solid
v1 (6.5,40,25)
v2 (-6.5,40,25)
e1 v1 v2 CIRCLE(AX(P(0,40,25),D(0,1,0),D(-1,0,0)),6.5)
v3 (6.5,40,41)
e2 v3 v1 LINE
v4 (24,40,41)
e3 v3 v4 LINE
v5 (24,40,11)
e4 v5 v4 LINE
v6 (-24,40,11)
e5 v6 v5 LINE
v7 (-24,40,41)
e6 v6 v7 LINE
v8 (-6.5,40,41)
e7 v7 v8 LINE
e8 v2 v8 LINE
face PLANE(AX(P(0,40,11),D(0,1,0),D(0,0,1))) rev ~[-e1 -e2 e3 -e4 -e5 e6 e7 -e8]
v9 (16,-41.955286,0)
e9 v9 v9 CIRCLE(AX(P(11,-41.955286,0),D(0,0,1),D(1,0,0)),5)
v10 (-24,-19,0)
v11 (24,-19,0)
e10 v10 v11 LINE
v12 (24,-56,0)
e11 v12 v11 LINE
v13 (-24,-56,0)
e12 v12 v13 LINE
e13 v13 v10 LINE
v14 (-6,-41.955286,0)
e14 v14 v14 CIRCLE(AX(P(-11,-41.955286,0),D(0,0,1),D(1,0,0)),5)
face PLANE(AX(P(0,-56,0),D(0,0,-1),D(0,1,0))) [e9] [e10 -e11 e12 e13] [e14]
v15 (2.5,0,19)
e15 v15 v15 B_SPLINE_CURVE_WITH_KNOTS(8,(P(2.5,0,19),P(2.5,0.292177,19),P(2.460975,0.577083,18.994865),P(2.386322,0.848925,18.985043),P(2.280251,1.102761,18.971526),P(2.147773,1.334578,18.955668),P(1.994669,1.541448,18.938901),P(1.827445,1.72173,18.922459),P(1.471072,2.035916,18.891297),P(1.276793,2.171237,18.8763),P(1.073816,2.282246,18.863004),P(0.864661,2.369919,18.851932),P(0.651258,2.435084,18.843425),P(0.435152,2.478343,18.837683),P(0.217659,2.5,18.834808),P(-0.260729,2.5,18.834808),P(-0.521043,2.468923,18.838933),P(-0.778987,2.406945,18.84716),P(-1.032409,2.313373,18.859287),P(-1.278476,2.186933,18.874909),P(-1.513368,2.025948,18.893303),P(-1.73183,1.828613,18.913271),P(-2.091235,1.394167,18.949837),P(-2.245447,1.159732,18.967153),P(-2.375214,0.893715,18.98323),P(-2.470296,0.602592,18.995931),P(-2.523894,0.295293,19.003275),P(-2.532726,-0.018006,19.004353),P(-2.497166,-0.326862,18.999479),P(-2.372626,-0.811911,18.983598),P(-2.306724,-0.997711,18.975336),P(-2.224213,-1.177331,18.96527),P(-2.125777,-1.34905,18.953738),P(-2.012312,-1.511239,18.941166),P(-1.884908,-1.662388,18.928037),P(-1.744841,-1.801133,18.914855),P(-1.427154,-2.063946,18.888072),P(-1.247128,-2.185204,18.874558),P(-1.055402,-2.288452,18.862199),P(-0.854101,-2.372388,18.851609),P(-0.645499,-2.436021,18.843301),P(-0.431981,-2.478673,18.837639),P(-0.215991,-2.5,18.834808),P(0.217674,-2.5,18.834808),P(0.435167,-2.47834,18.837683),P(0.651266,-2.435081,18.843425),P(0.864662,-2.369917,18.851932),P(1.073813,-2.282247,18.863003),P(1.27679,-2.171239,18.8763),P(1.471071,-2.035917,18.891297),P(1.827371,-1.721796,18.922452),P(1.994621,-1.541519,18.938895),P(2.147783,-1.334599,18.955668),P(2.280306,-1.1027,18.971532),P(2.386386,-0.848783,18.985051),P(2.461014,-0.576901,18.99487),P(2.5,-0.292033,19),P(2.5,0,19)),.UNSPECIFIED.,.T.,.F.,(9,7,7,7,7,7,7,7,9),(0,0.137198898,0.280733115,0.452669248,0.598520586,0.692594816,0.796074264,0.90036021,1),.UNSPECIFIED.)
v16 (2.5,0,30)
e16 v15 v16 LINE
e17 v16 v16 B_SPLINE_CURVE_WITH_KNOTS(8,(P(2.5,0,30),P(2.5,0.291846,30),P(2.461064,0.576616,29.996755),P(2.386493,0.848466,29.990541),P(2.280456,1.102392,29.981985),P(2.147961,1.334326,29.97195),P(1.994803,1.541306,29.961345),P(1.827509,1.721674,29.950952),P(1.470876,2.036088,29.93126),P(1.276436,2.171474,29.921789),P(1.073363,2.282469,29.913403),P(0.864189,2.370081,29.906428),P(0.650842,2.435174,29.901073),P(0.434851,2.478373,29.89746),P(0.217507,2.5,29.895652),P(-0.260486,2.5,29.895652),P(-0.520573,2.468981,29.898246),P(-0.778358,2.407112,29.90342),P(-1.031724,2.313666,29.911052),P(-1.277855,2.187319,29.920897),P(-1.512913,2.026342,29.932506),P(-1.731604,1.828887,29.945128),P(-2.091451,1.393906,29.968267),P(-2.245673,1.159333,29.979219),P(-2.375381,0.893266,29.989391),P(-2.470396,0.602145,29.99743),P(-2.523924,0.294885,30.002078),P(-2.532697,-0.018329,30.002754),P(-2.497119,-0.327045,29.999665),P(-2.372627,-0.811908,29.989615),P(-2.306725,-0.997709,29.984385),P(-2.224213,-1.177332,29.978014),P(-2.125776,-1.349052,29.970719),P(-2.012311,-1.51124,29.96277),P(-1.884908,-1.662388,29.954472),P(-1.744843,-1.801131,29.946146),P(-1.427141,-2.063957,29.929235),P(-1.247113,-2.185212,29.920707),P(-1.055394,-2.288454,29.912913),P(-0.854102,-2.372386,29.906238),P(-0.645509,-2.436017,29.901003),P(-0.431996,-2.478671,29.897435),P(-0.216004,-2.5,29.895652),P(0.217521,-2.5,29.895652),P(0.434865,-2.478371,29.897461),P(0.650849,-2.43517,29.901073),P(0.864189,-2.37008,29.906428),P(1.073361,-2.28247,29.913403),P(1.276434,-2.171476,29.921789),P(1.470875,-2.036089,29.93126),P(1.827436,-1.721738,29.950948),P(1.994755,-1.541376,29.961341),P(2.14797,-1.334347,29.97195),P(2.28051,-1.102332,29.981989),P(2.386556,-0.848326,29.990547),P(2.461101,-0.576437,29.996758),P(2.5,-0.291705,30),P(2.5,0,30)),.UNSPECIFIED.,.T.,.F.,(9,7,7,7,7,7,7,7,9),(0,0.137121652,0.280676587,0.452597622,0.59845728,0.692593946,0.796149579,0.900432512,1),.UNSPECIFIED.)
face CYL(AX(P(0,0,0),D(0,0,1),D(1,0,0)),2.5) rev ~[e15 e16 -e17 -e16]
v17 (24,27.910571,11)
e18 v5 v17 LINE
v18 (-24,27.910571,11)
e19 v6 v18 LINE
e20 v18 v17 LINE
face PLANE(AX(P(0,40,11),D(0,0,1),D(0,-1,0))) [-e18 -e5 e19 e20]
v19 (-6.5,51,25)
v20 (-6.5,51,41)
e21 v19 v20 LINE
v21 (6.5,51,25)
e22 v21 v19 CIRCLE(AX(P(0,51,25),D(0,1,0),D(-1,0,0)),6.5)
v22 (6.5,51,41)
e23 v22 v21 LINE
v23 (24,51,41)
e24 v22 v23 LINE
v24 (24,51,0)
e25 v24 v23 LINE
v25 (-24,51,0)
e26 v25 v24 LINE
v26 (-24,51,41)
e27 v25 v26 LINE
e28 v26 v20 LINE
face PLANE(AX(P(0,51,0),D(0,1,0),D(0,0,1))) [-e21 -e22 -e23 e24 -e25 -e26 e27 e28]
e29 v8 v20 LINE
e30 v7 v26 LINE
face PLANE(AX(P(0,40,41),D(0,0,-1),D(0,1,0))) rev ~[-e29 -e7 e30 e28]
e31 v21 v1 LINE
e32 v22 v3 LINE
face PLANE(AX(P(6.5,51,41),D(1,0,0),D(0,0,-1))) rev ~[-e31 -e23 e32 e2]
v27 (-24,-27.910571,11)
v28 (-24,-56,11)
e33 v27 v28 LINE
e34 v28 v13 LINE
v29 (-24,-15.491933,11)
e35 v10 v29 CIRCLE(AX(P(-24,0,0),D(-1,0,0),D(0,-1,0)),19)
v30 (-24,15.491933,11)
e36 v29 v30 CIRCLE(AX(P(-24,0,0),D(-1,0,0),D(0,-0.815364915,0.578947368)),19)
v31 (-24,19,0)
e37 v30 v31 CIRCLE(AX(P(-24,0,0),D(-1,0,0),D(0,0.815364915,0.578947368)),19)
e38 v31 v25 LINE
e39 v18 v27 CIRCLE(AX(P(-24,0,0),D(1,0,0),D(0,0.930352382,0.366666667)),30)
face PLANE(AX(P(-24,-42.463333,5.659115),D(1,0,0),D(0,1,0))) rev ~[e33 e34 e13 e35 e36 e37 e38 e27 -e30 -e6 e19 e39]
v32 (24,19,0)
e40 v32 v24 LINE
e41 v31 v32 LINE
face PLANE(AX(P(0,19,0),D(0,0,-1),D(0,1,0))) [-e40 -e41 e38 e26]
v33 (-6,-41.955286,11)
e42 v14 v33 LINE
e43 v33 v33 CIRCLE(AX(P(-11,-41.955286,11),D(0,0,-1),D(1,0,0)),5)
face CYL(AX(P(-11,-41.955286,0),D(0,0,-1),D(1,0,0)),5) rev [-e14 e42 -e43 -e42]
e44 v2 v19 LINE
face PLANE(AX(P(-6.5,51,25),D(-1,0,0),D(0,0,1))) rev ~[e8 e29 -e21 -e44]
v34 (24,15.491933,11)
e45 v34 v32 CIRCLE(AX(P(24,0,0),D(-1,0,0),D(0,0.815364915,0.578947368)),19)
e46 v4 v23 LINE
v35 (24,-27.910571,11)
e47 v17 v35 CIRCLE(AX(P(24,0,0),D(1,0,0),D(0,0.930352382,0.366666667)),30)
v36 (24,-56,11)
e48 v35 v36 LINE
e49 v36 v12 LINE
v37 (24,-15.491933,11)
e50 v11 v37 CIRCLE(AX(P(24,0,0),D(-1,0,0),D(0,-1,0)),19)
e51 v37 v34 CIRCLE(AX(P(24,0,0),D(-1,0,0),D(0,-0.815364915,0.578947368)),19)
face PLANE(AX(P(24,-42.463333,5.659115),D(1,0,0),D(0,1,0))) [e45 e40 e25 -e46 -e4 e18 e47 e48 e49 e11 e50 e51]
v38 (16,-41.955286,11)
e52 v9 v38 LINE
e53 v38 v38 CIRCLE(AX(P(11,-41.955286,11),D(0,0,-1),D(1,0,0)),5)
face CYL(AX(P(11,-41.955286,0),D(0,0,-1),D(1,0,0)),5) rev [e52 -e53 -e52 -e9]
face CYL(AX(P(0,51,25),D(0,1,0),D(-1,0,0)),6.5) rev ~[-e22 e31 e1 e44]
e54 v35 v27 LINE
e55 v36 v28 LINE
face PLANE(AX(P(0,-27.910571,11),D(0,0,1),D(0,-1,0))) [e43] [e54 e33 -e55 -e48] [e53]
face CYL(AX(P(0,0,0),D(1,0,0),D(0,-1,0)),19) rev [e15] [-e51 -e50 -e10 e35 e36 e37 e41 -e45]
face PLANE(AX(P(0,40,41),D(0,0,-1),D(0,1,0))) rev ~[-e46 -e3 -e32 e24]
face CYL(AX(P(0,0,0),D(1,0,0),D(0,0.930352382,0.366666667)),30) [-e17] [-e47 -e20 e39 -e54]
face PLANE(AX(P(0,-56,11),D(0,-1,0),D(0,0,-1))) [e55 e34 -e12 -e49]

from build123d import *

# Parameters (mm, degrees)
F0_W     = 11
F0_H     = 30
F1_DEPTH = 24
F3_DEPTH = 17.9
F4_R     = 5
F4_R_2   = 2.5
F5_DEPTH = 51.2


with BuildPart() as f1:
    # F0 (on Right) → F1 (new body, symmetric)
    with BuildSketch(Plane.YZ):
        with BuildLine():
            Line((-56, 0), (-30, 0))
            ThreePointArc((-30, 0), (-29.4730143031, 5.5983415304), (-27.9105714739, 11))
            Line((-27.9105714739, 11), (-56, 11))
            Line((-56, 11), (-56, 0))
        make_face()
        with BuildLine():
            ThreePointArc((-27.9105714739, 11), (-29.4730143031, 5.5983415304), (-30, 0))
            Line((-30, 0), (-19, 0))
            ThreePointArc((-19, 0), (-18.1017503893, 5.7729223833), (-15.4919333848, 11))
            Line((-15.4919333848, 11), (-27.9105714739, 11))
        make_face()
        with BuildLine():
            Line((15.4919333848, 11), (27.9105714739, 11))
            ThreePointArc((27.9105714739, 11), (0, 30), (-27.9105714739, 11))
            Line((-27.9105714739, 11), (-15.4919333848, 11))
            ThreePointArc((-15.4919333848, 11), (0, 19), (15.4919333848, 11))
        make_face()
        with BuildLine():
            Line((19, 0), (30, 0))
            ThreePointArc((30, 0), (29.4730143031, 5.5983415304), (27.9105714739, 11))
            Line((27.9105714739, 11), (15.4919333848, 11))
            ThreePointArc((15.4919333848, 11), (18.1017503893, 5.7729223833), (19, 0))
        make_face()
        with BuildLine():
            ThreePointArc((27.9105714739, 11), (29.4730143031, 5.5983415304), (30, 0))
            Line((30, 0), (51, 0))
            Line((51, 0), (51, 11))
            Line((51, 11), (40, 11))
            Line((40, 11), (27.9105714739, 11))
        make_face()
        with Locations((45.5, 26)):
            Rectangle(F0_W, F0_H)
    extrude(amount=F1_DEPTH, both=True)

    # F2 (on face) → F3 (cut, symmetric)
    with BuildSketch(Plane(origin=(0, 51, 0), x_dir=(-1, 0, 0), z_dir=(0, 1, 0))):
        with BuildLine():
            ThreePointArc((-6.5, 25), (0, 18.5), (6.5, 25))
            ThreePointArc((6.5, 25), (0, 31.5), (-6.5, 25))
        make_face()
        with BuildLine():
            ThreePointArc((-6.5, 25), (0, 31.5), (6.5, 25))
            Line((6.5, 25), (6.5, 41))
            Line((6.5, 41), (-6.5, 41))
            Line((-6.5, 41), (-6.5, 25))
        make_face()
    extrude(amount=F3_DEPTH, both=True, mode=Mode.SUBTRACT)

    # F4 (on Top) → F5 (cut, symmetric)
    with BuildSketch(Plane.XY):
        with Locations((-11, -41.955285737)):
            Circle(F4_R)
        with Locations((11, -41.955285737)):
            Circle(F4_R)
        Circle(F4_R_2)
    extrude(amount=F5_DEPTH, both=True, mode=Mode.SUBTRACT)


solid = f1.part
